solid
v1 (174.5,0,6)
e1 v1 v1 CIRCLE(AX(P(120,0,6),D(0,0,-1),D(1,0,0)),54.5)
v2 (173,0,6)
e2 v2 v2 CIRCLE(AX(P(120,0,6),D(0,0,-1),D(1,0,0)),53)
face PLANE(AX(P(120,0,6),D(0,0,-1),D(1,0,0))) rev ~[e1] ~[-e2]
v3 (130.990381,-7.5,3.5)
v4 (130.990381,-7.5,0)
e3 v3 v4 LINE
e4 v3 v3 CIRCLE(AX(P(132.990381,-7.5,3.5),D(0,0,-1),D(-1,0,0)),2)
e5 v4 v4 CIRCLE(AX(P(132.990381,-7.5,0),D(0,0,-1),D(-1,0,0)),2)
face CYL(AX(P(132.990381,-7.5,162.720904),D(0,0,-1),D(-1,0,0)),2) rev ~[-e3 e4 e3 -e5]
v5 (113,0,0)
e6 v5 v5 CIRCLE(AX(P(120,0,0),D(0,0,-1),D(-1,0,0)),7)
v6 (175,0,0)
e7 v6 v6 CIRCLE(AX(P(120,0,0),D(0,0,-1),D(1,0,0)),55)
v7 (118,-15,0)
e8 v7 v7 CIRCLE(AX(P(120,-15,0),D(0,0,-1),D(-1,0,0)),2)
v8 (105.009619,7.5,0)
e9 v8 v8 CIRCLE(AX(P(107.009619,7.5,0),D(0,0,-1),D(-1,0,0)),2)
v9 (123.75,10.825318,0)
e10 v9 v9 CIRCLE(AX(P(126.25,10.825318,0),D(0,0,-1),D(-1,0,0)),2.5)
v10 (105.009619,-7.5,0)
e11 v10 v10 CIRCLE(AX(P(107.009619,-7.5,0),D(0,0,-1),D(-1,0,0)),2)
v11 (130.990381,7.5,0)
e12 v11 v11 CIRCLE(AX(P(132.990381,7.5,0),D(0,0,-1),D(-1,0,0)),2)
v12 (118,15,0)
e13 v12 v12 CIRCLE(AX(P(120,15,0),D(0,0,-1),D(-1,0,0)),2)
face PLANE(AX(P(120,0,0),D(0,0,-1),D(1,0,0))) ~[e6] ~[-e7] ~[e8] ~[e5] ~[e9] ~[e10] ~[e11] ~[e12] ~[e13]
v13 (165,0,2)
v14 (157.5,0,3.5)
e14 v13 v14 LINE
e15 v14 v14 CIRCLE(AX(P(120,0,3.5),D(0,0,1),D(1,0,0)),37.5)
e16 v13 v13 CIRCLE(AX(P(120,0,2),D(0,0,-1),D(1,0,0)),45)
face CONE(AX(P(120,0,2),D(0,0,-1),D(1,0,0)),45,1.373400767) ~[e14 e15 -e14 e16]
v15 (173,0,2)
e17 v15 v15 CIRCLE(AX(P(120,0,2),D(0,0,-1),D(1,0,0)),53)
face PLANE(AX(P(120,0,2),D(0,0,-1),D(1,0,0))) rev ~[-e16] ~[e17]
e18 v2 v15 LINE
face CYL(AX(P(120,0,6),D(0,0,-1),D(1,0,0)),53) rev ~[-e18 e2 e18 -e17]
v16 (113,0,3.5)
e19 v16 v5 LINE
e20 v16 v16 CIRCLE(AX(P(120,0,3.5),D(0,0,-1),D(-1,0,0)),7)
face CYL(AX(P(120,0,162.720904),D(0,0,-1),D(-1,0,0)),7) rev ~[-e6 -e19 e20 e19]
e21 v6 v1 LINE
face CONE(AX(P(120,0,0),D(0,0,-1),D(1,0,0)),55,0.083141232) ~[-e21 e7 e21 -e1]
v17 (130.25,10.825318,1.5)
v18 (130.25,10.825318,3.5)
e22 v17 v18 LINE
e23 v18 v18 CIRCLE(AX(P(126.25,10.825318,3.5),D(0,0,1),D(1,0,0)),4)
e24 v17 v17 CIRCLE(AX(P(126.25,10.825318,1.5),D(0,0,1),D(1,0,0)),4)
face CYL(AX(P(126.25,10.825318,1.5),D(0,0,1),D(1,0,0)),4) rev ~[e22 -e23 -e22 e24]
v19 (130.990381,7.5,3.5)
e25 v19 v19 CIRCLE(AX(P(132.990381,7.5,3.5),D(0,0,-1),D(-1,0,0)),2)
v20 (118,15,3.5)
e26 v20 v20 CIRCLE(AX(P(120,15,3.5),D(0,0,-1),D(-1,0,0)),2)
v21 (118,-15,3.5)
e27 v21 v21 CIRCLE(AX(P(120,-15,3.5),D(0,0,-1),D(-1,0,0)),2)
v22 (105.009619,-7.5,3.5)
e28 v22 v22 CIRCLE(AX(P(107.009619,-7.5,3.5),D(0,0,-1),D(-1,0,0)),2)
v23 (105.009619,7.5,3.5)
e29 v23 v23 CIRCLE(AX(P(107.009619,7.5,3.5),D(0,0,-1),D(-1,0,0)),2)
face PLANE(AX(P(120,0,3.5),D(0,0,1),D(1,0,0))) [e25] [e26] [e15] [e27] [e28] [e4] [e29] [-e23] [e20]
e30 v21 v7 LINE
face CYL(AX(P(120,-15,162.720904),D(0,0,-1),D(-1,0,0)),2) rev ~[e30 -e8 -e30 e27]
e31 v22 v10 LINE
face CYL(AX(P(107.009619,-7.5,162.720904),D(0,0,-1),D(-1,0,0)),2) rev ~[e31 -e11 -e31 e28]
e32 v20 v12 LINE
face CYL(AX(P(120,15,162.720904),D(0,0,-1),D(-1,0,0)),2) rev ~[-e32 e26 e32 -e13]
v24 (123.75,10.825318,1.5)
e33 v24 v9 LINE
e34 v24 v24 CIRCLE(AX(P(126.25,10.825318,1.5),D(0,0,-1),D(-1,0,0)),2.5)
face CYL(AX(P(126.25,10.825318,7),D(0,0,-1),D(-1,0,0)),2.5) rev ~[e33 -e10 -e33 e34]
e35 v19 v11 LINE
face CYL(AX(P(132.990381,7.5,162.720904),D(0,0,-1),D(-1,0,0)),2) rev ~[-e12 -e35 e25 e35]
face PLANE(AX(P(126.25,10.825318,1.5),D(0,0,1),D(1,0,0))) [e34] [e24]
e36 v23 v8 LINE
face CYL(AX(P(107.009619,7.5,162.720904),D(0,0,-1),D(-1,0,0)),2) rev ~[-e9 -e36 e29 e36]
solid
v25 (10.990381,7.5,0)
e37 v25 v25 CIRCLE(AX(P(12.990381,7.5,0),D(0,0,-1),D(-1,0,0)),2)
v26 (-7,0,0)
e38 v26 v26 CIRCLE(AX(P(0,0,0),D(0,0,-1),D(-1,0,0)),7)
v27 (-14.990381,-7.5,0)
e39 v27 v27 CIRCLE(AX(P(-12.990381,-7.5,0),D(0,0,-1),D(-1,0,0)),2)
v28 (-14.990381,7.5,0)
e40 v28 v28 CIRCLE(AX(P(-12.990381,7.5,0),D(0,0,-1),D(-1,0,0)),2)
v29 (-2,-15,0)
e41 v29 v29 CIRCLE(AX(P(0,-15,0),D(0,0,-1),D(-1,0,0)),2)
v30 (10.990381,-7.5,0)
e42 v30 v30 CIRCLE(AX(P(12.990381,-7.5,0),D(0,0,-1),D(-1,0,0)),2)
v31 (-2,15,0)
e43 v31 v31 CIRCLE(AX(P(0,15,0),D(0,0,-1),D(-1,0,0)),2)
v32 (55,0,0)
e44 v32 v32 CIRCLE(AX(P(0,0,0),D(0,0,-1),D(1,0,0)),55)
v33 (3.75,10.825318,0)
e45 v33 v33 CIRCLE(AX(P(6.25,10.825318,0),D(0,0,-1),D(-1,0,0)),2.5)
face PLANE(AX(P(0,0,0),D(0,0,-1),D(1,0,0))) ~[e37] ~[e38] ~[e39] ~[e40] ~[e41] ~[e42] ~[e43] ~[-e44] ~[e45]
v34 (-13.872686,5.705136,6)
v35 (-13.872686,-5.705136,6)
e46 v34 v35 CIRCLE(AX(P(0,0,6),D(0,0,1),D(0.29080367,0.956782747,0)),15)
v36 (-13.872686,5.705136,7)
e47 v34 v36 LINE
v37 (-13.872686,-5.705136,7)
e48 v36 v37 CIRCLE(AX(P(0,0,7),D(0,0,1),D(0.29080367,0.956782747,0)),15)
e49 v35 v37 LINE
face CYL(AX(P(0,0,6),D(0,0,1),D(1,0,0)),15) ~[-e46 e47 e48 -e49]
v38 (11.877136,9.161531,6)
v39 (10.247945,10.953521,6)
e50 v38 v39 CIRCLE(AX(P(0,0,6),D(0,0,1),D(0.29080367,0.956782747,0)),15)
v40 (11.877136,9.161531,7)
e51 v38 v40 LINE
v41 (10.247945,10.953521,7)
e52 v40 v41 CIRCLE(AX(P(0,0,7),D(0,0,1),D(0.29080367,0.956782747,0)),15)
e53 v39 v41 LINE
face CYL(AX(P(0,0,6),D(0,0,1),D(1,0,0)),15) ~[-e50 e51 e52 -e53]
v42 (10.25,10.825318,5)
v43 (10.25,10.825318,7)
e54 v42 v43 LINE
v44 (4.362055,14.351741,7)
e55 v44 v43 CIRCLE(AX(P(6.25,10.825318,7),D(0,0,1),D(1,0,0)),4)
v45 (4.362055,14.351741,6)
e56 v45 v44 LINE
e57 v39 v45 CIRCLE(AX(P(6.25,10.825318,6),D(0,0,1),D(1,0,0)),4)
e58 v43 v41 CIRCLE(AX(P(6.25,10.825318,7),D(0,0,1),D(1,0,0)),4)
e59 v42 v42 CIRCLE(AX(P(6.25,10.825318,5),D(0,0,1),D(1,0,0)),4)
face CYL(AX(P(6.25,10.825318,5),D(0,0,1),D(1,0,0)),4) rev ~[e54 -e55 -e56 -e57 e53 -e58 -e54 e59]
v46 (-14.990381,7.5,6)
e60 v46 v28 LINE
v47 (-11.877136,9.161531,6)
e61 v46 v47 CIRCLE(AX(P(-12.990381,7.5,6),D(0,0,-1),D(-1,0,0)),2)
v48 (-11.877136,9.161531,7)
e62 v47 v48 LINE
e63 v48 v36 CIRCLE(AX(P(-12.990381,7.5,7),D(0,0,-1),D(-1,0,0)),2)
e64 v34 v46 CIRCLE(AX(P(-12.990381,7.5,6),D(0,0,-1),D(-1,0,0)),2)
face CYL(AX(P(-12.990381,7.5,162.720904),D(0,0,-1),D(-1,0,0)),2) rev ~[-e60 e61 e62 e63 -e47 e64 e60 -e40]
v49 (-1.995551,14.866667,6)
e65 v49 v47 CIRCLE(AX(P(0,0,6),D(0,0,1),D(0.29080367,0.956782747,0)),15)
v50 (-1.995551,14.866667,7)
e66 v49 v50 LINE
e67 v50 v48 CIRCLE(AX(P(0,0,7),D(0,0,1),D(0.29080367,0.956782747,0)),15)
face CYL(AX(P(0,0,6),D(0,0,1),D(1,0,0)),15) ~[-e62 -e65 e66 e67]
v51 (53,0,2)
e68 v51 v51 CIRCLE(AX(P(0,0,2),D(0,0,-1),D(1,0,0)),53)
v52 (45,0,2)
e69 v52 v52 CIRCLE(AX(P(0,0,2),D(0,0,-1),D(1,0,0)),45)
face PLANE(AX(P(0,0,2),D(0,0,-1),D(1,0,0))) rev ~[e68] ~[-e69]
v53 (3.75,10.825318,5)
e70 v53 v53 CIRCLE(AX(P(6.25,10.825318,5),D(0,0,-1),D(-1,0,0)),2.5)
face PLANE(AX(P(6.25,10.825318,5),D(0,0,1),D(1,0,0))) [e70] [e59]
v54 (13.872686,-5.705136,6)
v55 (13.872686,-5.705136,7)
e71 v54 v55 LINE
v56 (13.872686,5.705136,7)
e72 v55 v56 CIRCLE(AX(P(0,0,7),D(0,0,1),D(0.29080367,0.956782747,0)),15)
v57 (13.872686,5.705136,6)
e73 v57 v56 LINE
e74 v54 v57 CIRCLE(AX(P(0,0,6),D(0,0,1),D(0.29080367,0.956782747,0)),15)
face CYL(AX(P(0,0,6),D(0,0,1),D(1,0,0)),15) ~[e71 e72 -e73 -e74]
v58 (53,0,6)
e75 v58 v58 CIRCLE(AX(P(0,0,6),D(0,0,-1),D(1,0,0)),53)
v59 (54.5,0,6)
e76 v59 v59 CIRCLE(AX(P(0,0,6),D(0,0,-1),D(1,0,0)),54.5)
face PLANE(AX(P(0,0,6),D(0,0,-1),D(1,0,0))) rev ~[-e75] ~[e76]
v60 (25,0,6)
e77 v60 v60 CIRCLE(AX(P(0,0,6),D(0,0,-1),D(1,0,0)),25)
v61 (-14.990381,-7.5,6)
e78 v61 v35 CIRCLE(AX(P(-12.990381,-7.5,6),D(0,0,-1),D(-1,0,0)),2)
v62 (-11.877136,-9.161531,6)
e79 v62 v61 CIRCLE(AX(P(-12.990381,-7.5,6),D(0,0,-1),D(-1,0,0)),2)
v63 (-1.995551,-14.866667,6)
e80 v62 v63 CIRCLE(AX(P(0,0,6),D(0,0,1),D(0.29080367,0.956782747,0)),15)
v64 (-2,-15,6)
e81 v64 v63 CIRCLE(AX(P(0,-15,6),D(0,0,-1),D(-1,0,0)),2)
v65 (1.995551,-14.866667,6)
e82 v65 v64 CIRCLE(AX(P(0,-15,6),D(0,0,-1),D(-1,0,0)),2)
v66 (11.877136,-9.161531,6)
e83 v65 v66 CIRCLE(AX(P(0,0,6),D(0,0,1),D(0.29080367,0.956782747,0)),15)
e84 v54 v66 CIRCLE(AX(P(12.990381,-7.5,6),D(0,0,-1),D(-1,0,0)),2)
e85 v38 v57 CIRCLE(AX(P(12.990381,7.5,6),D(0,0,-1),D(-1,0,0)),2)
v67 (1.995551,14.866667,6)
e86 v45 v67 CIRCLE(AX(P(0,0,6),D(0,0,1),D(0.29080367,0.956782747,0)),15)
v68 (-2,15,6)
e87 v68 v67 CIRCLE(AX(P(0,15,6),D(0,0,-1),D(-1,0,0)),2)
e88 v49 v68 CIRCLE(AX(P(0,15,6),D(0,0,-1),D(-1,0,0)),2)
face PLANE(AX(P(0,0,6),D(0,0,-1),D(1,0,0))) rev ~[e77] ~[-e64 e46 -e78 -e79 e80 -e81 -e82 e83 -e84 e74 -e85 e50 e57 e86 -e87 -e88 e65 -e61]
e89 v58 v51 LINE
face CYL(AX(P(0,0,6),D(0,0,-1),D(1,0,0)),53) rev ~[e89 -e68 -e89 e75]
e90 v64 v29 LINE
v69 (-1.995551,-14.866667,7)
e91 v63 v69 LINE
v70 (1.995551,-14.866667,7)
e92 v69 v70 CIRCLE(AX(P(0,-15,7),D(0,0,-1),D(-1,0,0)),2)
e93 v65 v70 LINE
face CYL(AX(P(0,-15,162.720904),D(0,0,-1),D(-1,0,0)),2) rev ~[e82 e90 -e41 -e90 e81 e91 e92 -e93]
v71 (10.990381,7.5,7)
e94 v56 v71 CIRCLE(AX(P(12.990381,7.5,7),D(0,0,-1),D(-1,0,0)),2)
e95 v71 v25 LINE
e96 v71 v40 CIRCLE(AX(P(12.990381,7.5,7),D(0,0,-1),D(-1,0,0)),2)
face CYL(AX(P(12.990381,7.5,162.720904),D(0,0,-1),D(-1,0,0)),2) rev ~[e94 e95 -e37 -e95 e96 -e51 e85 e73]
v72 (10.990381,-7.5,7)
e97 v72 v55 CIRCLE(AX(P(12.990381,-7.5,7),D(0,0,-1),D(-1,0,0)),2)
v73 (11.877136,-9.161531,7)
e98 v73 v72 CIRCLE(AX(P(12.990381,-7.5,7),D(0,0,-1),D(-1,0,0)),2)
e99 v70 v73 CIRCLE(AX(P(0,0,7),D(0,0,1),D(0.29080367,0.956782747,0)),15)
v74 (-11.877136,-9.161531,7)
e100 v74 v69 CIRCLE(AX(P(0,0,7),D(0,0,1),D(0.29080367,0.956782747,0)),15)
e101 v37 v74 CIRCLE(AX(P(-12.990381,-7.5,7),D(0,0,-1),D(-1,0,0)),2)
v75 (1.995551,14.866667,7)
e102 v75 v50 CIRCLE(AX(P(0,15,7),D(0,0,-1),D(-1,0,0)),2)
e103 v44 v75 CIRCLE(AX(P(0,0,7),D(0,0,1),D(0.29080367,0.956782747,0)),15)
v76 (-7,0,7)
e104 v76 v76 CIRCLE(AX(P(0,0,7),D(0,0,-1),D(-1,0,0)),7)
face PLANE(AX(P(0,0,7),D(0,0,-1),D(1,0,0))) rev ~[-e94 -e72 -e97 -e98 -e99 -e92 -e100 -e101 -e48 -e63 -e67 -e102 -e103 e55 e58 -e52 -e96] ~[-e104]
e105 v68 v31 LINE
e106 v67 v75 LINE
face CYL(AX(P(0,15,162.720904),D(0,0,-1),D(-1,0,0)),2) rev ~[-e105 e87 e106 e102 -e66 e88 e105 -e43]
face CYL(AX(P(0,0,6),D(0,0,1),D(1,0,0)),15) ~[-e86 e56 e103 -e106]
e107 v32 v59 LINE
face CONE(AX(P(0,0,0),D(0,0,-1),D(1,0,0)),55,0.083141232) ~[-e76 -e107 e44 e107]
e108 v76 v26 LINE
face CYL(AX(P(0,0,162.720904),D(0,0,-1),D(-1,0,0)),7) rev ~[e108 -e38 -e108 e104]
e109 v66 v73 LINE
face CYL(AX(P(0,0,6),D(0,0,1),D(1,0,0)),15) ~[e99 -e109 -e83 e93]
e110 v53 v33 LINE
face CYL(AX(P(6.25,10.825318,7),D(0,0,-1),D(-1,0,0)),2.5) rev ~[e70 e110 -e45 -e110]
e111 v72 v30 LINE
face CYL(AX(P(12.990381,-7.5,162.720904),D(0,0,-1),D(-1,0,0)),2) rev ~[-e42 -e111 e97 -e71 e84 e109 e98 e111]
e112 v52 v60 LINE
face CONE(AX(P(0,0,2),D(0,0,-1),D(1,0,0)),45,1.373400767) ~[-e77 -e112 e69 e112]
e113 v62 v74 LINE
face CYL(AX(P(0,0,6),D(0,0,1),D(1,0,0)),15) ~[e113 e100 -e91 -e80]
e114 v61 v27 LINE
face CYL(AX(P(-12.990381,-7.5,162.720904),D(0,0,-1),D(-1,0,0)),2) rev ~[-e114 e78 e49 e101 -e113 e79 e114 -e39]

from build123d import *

# Parameters (mm, degrees)
F3_D           = 5
F3_CBORE_D     = 8
F3_CBORE_DEPTH = 2
F4_D           = 4
F5_D           = 14
F7_R           = 50
F7_R_2         = 2.5
F8_DEPTH       = 3.5
F9_D           = 5
F9_START       = 3.5
F9_CBORE_D     = 8
F9_CBORE_DEPTH = 2


with BuildPart() as f1:
    # F0 (on Front) → F1 (revolve)
    with BuildSketch(Plane.XZ):
        Polygon((0, 7), (0, 0), (55, 0), (54.5, 6), (53, 6), (53, 2), (45, 2), (25, 6), (15, 6), (15, 7), align=None)
    revolve(axis=Axis((0, 0, 0), (0, 0, -1)))

    # F3 (through all)
    with Locations(Plane.XY.offset(7)):
        with Locations((6.25, 10.8253175473)):
            CounterBoreHole(F3_D / 2, F3_CBORE_D / 2, F3_CBORE_DEPTH)

    # F4 (through all)
    with Locations(Plane.XY.offset(7)):
        with Locations((0, 15), (12.9903810568, 7.5), (12.9903810568, -7.5), (0, -15), (-12.9903810568, -7.5), (-12.9903810568, 7.5)):
            Hole(F4_D / 2)

    # F5 (through all)
    with Locations(Plane.XY.offset(7)):
        with Locations((0, 0)):
            Hole(F5_D / 2)


with BuildPart() as f6_1:
    # F6: copy of F1
    add(f1.part.moved(Location((120, 0, 0))))

    # F7 (on face) → F8 (cut)
    with BuildSketch(Plane.XY.offset(7)):
        with Locations((120, 0)):
            Circle(F7_R)
        with Locations((126.25, 10.8253175473)):
            Circle(F7_R_2, mode=Mode.SUBTRACT)
    extrude(amount=-F8_DEPTH, mode=Mode.SUBTRACT)

    # F9 (through all)
    # its depths count from where the whole tool has entered the part; down to there all is cleared
    with Locations(Plane.XY.offset(7).offset(-F9_START)):
        with Locations((126.25, 10.8253175473)):
            CounterBoreHole(F9_D / 2, F9_CBORE_D / 2, F9_CBORE_DEPTH)


solid = Compound([f1.part, f6_1.part])
